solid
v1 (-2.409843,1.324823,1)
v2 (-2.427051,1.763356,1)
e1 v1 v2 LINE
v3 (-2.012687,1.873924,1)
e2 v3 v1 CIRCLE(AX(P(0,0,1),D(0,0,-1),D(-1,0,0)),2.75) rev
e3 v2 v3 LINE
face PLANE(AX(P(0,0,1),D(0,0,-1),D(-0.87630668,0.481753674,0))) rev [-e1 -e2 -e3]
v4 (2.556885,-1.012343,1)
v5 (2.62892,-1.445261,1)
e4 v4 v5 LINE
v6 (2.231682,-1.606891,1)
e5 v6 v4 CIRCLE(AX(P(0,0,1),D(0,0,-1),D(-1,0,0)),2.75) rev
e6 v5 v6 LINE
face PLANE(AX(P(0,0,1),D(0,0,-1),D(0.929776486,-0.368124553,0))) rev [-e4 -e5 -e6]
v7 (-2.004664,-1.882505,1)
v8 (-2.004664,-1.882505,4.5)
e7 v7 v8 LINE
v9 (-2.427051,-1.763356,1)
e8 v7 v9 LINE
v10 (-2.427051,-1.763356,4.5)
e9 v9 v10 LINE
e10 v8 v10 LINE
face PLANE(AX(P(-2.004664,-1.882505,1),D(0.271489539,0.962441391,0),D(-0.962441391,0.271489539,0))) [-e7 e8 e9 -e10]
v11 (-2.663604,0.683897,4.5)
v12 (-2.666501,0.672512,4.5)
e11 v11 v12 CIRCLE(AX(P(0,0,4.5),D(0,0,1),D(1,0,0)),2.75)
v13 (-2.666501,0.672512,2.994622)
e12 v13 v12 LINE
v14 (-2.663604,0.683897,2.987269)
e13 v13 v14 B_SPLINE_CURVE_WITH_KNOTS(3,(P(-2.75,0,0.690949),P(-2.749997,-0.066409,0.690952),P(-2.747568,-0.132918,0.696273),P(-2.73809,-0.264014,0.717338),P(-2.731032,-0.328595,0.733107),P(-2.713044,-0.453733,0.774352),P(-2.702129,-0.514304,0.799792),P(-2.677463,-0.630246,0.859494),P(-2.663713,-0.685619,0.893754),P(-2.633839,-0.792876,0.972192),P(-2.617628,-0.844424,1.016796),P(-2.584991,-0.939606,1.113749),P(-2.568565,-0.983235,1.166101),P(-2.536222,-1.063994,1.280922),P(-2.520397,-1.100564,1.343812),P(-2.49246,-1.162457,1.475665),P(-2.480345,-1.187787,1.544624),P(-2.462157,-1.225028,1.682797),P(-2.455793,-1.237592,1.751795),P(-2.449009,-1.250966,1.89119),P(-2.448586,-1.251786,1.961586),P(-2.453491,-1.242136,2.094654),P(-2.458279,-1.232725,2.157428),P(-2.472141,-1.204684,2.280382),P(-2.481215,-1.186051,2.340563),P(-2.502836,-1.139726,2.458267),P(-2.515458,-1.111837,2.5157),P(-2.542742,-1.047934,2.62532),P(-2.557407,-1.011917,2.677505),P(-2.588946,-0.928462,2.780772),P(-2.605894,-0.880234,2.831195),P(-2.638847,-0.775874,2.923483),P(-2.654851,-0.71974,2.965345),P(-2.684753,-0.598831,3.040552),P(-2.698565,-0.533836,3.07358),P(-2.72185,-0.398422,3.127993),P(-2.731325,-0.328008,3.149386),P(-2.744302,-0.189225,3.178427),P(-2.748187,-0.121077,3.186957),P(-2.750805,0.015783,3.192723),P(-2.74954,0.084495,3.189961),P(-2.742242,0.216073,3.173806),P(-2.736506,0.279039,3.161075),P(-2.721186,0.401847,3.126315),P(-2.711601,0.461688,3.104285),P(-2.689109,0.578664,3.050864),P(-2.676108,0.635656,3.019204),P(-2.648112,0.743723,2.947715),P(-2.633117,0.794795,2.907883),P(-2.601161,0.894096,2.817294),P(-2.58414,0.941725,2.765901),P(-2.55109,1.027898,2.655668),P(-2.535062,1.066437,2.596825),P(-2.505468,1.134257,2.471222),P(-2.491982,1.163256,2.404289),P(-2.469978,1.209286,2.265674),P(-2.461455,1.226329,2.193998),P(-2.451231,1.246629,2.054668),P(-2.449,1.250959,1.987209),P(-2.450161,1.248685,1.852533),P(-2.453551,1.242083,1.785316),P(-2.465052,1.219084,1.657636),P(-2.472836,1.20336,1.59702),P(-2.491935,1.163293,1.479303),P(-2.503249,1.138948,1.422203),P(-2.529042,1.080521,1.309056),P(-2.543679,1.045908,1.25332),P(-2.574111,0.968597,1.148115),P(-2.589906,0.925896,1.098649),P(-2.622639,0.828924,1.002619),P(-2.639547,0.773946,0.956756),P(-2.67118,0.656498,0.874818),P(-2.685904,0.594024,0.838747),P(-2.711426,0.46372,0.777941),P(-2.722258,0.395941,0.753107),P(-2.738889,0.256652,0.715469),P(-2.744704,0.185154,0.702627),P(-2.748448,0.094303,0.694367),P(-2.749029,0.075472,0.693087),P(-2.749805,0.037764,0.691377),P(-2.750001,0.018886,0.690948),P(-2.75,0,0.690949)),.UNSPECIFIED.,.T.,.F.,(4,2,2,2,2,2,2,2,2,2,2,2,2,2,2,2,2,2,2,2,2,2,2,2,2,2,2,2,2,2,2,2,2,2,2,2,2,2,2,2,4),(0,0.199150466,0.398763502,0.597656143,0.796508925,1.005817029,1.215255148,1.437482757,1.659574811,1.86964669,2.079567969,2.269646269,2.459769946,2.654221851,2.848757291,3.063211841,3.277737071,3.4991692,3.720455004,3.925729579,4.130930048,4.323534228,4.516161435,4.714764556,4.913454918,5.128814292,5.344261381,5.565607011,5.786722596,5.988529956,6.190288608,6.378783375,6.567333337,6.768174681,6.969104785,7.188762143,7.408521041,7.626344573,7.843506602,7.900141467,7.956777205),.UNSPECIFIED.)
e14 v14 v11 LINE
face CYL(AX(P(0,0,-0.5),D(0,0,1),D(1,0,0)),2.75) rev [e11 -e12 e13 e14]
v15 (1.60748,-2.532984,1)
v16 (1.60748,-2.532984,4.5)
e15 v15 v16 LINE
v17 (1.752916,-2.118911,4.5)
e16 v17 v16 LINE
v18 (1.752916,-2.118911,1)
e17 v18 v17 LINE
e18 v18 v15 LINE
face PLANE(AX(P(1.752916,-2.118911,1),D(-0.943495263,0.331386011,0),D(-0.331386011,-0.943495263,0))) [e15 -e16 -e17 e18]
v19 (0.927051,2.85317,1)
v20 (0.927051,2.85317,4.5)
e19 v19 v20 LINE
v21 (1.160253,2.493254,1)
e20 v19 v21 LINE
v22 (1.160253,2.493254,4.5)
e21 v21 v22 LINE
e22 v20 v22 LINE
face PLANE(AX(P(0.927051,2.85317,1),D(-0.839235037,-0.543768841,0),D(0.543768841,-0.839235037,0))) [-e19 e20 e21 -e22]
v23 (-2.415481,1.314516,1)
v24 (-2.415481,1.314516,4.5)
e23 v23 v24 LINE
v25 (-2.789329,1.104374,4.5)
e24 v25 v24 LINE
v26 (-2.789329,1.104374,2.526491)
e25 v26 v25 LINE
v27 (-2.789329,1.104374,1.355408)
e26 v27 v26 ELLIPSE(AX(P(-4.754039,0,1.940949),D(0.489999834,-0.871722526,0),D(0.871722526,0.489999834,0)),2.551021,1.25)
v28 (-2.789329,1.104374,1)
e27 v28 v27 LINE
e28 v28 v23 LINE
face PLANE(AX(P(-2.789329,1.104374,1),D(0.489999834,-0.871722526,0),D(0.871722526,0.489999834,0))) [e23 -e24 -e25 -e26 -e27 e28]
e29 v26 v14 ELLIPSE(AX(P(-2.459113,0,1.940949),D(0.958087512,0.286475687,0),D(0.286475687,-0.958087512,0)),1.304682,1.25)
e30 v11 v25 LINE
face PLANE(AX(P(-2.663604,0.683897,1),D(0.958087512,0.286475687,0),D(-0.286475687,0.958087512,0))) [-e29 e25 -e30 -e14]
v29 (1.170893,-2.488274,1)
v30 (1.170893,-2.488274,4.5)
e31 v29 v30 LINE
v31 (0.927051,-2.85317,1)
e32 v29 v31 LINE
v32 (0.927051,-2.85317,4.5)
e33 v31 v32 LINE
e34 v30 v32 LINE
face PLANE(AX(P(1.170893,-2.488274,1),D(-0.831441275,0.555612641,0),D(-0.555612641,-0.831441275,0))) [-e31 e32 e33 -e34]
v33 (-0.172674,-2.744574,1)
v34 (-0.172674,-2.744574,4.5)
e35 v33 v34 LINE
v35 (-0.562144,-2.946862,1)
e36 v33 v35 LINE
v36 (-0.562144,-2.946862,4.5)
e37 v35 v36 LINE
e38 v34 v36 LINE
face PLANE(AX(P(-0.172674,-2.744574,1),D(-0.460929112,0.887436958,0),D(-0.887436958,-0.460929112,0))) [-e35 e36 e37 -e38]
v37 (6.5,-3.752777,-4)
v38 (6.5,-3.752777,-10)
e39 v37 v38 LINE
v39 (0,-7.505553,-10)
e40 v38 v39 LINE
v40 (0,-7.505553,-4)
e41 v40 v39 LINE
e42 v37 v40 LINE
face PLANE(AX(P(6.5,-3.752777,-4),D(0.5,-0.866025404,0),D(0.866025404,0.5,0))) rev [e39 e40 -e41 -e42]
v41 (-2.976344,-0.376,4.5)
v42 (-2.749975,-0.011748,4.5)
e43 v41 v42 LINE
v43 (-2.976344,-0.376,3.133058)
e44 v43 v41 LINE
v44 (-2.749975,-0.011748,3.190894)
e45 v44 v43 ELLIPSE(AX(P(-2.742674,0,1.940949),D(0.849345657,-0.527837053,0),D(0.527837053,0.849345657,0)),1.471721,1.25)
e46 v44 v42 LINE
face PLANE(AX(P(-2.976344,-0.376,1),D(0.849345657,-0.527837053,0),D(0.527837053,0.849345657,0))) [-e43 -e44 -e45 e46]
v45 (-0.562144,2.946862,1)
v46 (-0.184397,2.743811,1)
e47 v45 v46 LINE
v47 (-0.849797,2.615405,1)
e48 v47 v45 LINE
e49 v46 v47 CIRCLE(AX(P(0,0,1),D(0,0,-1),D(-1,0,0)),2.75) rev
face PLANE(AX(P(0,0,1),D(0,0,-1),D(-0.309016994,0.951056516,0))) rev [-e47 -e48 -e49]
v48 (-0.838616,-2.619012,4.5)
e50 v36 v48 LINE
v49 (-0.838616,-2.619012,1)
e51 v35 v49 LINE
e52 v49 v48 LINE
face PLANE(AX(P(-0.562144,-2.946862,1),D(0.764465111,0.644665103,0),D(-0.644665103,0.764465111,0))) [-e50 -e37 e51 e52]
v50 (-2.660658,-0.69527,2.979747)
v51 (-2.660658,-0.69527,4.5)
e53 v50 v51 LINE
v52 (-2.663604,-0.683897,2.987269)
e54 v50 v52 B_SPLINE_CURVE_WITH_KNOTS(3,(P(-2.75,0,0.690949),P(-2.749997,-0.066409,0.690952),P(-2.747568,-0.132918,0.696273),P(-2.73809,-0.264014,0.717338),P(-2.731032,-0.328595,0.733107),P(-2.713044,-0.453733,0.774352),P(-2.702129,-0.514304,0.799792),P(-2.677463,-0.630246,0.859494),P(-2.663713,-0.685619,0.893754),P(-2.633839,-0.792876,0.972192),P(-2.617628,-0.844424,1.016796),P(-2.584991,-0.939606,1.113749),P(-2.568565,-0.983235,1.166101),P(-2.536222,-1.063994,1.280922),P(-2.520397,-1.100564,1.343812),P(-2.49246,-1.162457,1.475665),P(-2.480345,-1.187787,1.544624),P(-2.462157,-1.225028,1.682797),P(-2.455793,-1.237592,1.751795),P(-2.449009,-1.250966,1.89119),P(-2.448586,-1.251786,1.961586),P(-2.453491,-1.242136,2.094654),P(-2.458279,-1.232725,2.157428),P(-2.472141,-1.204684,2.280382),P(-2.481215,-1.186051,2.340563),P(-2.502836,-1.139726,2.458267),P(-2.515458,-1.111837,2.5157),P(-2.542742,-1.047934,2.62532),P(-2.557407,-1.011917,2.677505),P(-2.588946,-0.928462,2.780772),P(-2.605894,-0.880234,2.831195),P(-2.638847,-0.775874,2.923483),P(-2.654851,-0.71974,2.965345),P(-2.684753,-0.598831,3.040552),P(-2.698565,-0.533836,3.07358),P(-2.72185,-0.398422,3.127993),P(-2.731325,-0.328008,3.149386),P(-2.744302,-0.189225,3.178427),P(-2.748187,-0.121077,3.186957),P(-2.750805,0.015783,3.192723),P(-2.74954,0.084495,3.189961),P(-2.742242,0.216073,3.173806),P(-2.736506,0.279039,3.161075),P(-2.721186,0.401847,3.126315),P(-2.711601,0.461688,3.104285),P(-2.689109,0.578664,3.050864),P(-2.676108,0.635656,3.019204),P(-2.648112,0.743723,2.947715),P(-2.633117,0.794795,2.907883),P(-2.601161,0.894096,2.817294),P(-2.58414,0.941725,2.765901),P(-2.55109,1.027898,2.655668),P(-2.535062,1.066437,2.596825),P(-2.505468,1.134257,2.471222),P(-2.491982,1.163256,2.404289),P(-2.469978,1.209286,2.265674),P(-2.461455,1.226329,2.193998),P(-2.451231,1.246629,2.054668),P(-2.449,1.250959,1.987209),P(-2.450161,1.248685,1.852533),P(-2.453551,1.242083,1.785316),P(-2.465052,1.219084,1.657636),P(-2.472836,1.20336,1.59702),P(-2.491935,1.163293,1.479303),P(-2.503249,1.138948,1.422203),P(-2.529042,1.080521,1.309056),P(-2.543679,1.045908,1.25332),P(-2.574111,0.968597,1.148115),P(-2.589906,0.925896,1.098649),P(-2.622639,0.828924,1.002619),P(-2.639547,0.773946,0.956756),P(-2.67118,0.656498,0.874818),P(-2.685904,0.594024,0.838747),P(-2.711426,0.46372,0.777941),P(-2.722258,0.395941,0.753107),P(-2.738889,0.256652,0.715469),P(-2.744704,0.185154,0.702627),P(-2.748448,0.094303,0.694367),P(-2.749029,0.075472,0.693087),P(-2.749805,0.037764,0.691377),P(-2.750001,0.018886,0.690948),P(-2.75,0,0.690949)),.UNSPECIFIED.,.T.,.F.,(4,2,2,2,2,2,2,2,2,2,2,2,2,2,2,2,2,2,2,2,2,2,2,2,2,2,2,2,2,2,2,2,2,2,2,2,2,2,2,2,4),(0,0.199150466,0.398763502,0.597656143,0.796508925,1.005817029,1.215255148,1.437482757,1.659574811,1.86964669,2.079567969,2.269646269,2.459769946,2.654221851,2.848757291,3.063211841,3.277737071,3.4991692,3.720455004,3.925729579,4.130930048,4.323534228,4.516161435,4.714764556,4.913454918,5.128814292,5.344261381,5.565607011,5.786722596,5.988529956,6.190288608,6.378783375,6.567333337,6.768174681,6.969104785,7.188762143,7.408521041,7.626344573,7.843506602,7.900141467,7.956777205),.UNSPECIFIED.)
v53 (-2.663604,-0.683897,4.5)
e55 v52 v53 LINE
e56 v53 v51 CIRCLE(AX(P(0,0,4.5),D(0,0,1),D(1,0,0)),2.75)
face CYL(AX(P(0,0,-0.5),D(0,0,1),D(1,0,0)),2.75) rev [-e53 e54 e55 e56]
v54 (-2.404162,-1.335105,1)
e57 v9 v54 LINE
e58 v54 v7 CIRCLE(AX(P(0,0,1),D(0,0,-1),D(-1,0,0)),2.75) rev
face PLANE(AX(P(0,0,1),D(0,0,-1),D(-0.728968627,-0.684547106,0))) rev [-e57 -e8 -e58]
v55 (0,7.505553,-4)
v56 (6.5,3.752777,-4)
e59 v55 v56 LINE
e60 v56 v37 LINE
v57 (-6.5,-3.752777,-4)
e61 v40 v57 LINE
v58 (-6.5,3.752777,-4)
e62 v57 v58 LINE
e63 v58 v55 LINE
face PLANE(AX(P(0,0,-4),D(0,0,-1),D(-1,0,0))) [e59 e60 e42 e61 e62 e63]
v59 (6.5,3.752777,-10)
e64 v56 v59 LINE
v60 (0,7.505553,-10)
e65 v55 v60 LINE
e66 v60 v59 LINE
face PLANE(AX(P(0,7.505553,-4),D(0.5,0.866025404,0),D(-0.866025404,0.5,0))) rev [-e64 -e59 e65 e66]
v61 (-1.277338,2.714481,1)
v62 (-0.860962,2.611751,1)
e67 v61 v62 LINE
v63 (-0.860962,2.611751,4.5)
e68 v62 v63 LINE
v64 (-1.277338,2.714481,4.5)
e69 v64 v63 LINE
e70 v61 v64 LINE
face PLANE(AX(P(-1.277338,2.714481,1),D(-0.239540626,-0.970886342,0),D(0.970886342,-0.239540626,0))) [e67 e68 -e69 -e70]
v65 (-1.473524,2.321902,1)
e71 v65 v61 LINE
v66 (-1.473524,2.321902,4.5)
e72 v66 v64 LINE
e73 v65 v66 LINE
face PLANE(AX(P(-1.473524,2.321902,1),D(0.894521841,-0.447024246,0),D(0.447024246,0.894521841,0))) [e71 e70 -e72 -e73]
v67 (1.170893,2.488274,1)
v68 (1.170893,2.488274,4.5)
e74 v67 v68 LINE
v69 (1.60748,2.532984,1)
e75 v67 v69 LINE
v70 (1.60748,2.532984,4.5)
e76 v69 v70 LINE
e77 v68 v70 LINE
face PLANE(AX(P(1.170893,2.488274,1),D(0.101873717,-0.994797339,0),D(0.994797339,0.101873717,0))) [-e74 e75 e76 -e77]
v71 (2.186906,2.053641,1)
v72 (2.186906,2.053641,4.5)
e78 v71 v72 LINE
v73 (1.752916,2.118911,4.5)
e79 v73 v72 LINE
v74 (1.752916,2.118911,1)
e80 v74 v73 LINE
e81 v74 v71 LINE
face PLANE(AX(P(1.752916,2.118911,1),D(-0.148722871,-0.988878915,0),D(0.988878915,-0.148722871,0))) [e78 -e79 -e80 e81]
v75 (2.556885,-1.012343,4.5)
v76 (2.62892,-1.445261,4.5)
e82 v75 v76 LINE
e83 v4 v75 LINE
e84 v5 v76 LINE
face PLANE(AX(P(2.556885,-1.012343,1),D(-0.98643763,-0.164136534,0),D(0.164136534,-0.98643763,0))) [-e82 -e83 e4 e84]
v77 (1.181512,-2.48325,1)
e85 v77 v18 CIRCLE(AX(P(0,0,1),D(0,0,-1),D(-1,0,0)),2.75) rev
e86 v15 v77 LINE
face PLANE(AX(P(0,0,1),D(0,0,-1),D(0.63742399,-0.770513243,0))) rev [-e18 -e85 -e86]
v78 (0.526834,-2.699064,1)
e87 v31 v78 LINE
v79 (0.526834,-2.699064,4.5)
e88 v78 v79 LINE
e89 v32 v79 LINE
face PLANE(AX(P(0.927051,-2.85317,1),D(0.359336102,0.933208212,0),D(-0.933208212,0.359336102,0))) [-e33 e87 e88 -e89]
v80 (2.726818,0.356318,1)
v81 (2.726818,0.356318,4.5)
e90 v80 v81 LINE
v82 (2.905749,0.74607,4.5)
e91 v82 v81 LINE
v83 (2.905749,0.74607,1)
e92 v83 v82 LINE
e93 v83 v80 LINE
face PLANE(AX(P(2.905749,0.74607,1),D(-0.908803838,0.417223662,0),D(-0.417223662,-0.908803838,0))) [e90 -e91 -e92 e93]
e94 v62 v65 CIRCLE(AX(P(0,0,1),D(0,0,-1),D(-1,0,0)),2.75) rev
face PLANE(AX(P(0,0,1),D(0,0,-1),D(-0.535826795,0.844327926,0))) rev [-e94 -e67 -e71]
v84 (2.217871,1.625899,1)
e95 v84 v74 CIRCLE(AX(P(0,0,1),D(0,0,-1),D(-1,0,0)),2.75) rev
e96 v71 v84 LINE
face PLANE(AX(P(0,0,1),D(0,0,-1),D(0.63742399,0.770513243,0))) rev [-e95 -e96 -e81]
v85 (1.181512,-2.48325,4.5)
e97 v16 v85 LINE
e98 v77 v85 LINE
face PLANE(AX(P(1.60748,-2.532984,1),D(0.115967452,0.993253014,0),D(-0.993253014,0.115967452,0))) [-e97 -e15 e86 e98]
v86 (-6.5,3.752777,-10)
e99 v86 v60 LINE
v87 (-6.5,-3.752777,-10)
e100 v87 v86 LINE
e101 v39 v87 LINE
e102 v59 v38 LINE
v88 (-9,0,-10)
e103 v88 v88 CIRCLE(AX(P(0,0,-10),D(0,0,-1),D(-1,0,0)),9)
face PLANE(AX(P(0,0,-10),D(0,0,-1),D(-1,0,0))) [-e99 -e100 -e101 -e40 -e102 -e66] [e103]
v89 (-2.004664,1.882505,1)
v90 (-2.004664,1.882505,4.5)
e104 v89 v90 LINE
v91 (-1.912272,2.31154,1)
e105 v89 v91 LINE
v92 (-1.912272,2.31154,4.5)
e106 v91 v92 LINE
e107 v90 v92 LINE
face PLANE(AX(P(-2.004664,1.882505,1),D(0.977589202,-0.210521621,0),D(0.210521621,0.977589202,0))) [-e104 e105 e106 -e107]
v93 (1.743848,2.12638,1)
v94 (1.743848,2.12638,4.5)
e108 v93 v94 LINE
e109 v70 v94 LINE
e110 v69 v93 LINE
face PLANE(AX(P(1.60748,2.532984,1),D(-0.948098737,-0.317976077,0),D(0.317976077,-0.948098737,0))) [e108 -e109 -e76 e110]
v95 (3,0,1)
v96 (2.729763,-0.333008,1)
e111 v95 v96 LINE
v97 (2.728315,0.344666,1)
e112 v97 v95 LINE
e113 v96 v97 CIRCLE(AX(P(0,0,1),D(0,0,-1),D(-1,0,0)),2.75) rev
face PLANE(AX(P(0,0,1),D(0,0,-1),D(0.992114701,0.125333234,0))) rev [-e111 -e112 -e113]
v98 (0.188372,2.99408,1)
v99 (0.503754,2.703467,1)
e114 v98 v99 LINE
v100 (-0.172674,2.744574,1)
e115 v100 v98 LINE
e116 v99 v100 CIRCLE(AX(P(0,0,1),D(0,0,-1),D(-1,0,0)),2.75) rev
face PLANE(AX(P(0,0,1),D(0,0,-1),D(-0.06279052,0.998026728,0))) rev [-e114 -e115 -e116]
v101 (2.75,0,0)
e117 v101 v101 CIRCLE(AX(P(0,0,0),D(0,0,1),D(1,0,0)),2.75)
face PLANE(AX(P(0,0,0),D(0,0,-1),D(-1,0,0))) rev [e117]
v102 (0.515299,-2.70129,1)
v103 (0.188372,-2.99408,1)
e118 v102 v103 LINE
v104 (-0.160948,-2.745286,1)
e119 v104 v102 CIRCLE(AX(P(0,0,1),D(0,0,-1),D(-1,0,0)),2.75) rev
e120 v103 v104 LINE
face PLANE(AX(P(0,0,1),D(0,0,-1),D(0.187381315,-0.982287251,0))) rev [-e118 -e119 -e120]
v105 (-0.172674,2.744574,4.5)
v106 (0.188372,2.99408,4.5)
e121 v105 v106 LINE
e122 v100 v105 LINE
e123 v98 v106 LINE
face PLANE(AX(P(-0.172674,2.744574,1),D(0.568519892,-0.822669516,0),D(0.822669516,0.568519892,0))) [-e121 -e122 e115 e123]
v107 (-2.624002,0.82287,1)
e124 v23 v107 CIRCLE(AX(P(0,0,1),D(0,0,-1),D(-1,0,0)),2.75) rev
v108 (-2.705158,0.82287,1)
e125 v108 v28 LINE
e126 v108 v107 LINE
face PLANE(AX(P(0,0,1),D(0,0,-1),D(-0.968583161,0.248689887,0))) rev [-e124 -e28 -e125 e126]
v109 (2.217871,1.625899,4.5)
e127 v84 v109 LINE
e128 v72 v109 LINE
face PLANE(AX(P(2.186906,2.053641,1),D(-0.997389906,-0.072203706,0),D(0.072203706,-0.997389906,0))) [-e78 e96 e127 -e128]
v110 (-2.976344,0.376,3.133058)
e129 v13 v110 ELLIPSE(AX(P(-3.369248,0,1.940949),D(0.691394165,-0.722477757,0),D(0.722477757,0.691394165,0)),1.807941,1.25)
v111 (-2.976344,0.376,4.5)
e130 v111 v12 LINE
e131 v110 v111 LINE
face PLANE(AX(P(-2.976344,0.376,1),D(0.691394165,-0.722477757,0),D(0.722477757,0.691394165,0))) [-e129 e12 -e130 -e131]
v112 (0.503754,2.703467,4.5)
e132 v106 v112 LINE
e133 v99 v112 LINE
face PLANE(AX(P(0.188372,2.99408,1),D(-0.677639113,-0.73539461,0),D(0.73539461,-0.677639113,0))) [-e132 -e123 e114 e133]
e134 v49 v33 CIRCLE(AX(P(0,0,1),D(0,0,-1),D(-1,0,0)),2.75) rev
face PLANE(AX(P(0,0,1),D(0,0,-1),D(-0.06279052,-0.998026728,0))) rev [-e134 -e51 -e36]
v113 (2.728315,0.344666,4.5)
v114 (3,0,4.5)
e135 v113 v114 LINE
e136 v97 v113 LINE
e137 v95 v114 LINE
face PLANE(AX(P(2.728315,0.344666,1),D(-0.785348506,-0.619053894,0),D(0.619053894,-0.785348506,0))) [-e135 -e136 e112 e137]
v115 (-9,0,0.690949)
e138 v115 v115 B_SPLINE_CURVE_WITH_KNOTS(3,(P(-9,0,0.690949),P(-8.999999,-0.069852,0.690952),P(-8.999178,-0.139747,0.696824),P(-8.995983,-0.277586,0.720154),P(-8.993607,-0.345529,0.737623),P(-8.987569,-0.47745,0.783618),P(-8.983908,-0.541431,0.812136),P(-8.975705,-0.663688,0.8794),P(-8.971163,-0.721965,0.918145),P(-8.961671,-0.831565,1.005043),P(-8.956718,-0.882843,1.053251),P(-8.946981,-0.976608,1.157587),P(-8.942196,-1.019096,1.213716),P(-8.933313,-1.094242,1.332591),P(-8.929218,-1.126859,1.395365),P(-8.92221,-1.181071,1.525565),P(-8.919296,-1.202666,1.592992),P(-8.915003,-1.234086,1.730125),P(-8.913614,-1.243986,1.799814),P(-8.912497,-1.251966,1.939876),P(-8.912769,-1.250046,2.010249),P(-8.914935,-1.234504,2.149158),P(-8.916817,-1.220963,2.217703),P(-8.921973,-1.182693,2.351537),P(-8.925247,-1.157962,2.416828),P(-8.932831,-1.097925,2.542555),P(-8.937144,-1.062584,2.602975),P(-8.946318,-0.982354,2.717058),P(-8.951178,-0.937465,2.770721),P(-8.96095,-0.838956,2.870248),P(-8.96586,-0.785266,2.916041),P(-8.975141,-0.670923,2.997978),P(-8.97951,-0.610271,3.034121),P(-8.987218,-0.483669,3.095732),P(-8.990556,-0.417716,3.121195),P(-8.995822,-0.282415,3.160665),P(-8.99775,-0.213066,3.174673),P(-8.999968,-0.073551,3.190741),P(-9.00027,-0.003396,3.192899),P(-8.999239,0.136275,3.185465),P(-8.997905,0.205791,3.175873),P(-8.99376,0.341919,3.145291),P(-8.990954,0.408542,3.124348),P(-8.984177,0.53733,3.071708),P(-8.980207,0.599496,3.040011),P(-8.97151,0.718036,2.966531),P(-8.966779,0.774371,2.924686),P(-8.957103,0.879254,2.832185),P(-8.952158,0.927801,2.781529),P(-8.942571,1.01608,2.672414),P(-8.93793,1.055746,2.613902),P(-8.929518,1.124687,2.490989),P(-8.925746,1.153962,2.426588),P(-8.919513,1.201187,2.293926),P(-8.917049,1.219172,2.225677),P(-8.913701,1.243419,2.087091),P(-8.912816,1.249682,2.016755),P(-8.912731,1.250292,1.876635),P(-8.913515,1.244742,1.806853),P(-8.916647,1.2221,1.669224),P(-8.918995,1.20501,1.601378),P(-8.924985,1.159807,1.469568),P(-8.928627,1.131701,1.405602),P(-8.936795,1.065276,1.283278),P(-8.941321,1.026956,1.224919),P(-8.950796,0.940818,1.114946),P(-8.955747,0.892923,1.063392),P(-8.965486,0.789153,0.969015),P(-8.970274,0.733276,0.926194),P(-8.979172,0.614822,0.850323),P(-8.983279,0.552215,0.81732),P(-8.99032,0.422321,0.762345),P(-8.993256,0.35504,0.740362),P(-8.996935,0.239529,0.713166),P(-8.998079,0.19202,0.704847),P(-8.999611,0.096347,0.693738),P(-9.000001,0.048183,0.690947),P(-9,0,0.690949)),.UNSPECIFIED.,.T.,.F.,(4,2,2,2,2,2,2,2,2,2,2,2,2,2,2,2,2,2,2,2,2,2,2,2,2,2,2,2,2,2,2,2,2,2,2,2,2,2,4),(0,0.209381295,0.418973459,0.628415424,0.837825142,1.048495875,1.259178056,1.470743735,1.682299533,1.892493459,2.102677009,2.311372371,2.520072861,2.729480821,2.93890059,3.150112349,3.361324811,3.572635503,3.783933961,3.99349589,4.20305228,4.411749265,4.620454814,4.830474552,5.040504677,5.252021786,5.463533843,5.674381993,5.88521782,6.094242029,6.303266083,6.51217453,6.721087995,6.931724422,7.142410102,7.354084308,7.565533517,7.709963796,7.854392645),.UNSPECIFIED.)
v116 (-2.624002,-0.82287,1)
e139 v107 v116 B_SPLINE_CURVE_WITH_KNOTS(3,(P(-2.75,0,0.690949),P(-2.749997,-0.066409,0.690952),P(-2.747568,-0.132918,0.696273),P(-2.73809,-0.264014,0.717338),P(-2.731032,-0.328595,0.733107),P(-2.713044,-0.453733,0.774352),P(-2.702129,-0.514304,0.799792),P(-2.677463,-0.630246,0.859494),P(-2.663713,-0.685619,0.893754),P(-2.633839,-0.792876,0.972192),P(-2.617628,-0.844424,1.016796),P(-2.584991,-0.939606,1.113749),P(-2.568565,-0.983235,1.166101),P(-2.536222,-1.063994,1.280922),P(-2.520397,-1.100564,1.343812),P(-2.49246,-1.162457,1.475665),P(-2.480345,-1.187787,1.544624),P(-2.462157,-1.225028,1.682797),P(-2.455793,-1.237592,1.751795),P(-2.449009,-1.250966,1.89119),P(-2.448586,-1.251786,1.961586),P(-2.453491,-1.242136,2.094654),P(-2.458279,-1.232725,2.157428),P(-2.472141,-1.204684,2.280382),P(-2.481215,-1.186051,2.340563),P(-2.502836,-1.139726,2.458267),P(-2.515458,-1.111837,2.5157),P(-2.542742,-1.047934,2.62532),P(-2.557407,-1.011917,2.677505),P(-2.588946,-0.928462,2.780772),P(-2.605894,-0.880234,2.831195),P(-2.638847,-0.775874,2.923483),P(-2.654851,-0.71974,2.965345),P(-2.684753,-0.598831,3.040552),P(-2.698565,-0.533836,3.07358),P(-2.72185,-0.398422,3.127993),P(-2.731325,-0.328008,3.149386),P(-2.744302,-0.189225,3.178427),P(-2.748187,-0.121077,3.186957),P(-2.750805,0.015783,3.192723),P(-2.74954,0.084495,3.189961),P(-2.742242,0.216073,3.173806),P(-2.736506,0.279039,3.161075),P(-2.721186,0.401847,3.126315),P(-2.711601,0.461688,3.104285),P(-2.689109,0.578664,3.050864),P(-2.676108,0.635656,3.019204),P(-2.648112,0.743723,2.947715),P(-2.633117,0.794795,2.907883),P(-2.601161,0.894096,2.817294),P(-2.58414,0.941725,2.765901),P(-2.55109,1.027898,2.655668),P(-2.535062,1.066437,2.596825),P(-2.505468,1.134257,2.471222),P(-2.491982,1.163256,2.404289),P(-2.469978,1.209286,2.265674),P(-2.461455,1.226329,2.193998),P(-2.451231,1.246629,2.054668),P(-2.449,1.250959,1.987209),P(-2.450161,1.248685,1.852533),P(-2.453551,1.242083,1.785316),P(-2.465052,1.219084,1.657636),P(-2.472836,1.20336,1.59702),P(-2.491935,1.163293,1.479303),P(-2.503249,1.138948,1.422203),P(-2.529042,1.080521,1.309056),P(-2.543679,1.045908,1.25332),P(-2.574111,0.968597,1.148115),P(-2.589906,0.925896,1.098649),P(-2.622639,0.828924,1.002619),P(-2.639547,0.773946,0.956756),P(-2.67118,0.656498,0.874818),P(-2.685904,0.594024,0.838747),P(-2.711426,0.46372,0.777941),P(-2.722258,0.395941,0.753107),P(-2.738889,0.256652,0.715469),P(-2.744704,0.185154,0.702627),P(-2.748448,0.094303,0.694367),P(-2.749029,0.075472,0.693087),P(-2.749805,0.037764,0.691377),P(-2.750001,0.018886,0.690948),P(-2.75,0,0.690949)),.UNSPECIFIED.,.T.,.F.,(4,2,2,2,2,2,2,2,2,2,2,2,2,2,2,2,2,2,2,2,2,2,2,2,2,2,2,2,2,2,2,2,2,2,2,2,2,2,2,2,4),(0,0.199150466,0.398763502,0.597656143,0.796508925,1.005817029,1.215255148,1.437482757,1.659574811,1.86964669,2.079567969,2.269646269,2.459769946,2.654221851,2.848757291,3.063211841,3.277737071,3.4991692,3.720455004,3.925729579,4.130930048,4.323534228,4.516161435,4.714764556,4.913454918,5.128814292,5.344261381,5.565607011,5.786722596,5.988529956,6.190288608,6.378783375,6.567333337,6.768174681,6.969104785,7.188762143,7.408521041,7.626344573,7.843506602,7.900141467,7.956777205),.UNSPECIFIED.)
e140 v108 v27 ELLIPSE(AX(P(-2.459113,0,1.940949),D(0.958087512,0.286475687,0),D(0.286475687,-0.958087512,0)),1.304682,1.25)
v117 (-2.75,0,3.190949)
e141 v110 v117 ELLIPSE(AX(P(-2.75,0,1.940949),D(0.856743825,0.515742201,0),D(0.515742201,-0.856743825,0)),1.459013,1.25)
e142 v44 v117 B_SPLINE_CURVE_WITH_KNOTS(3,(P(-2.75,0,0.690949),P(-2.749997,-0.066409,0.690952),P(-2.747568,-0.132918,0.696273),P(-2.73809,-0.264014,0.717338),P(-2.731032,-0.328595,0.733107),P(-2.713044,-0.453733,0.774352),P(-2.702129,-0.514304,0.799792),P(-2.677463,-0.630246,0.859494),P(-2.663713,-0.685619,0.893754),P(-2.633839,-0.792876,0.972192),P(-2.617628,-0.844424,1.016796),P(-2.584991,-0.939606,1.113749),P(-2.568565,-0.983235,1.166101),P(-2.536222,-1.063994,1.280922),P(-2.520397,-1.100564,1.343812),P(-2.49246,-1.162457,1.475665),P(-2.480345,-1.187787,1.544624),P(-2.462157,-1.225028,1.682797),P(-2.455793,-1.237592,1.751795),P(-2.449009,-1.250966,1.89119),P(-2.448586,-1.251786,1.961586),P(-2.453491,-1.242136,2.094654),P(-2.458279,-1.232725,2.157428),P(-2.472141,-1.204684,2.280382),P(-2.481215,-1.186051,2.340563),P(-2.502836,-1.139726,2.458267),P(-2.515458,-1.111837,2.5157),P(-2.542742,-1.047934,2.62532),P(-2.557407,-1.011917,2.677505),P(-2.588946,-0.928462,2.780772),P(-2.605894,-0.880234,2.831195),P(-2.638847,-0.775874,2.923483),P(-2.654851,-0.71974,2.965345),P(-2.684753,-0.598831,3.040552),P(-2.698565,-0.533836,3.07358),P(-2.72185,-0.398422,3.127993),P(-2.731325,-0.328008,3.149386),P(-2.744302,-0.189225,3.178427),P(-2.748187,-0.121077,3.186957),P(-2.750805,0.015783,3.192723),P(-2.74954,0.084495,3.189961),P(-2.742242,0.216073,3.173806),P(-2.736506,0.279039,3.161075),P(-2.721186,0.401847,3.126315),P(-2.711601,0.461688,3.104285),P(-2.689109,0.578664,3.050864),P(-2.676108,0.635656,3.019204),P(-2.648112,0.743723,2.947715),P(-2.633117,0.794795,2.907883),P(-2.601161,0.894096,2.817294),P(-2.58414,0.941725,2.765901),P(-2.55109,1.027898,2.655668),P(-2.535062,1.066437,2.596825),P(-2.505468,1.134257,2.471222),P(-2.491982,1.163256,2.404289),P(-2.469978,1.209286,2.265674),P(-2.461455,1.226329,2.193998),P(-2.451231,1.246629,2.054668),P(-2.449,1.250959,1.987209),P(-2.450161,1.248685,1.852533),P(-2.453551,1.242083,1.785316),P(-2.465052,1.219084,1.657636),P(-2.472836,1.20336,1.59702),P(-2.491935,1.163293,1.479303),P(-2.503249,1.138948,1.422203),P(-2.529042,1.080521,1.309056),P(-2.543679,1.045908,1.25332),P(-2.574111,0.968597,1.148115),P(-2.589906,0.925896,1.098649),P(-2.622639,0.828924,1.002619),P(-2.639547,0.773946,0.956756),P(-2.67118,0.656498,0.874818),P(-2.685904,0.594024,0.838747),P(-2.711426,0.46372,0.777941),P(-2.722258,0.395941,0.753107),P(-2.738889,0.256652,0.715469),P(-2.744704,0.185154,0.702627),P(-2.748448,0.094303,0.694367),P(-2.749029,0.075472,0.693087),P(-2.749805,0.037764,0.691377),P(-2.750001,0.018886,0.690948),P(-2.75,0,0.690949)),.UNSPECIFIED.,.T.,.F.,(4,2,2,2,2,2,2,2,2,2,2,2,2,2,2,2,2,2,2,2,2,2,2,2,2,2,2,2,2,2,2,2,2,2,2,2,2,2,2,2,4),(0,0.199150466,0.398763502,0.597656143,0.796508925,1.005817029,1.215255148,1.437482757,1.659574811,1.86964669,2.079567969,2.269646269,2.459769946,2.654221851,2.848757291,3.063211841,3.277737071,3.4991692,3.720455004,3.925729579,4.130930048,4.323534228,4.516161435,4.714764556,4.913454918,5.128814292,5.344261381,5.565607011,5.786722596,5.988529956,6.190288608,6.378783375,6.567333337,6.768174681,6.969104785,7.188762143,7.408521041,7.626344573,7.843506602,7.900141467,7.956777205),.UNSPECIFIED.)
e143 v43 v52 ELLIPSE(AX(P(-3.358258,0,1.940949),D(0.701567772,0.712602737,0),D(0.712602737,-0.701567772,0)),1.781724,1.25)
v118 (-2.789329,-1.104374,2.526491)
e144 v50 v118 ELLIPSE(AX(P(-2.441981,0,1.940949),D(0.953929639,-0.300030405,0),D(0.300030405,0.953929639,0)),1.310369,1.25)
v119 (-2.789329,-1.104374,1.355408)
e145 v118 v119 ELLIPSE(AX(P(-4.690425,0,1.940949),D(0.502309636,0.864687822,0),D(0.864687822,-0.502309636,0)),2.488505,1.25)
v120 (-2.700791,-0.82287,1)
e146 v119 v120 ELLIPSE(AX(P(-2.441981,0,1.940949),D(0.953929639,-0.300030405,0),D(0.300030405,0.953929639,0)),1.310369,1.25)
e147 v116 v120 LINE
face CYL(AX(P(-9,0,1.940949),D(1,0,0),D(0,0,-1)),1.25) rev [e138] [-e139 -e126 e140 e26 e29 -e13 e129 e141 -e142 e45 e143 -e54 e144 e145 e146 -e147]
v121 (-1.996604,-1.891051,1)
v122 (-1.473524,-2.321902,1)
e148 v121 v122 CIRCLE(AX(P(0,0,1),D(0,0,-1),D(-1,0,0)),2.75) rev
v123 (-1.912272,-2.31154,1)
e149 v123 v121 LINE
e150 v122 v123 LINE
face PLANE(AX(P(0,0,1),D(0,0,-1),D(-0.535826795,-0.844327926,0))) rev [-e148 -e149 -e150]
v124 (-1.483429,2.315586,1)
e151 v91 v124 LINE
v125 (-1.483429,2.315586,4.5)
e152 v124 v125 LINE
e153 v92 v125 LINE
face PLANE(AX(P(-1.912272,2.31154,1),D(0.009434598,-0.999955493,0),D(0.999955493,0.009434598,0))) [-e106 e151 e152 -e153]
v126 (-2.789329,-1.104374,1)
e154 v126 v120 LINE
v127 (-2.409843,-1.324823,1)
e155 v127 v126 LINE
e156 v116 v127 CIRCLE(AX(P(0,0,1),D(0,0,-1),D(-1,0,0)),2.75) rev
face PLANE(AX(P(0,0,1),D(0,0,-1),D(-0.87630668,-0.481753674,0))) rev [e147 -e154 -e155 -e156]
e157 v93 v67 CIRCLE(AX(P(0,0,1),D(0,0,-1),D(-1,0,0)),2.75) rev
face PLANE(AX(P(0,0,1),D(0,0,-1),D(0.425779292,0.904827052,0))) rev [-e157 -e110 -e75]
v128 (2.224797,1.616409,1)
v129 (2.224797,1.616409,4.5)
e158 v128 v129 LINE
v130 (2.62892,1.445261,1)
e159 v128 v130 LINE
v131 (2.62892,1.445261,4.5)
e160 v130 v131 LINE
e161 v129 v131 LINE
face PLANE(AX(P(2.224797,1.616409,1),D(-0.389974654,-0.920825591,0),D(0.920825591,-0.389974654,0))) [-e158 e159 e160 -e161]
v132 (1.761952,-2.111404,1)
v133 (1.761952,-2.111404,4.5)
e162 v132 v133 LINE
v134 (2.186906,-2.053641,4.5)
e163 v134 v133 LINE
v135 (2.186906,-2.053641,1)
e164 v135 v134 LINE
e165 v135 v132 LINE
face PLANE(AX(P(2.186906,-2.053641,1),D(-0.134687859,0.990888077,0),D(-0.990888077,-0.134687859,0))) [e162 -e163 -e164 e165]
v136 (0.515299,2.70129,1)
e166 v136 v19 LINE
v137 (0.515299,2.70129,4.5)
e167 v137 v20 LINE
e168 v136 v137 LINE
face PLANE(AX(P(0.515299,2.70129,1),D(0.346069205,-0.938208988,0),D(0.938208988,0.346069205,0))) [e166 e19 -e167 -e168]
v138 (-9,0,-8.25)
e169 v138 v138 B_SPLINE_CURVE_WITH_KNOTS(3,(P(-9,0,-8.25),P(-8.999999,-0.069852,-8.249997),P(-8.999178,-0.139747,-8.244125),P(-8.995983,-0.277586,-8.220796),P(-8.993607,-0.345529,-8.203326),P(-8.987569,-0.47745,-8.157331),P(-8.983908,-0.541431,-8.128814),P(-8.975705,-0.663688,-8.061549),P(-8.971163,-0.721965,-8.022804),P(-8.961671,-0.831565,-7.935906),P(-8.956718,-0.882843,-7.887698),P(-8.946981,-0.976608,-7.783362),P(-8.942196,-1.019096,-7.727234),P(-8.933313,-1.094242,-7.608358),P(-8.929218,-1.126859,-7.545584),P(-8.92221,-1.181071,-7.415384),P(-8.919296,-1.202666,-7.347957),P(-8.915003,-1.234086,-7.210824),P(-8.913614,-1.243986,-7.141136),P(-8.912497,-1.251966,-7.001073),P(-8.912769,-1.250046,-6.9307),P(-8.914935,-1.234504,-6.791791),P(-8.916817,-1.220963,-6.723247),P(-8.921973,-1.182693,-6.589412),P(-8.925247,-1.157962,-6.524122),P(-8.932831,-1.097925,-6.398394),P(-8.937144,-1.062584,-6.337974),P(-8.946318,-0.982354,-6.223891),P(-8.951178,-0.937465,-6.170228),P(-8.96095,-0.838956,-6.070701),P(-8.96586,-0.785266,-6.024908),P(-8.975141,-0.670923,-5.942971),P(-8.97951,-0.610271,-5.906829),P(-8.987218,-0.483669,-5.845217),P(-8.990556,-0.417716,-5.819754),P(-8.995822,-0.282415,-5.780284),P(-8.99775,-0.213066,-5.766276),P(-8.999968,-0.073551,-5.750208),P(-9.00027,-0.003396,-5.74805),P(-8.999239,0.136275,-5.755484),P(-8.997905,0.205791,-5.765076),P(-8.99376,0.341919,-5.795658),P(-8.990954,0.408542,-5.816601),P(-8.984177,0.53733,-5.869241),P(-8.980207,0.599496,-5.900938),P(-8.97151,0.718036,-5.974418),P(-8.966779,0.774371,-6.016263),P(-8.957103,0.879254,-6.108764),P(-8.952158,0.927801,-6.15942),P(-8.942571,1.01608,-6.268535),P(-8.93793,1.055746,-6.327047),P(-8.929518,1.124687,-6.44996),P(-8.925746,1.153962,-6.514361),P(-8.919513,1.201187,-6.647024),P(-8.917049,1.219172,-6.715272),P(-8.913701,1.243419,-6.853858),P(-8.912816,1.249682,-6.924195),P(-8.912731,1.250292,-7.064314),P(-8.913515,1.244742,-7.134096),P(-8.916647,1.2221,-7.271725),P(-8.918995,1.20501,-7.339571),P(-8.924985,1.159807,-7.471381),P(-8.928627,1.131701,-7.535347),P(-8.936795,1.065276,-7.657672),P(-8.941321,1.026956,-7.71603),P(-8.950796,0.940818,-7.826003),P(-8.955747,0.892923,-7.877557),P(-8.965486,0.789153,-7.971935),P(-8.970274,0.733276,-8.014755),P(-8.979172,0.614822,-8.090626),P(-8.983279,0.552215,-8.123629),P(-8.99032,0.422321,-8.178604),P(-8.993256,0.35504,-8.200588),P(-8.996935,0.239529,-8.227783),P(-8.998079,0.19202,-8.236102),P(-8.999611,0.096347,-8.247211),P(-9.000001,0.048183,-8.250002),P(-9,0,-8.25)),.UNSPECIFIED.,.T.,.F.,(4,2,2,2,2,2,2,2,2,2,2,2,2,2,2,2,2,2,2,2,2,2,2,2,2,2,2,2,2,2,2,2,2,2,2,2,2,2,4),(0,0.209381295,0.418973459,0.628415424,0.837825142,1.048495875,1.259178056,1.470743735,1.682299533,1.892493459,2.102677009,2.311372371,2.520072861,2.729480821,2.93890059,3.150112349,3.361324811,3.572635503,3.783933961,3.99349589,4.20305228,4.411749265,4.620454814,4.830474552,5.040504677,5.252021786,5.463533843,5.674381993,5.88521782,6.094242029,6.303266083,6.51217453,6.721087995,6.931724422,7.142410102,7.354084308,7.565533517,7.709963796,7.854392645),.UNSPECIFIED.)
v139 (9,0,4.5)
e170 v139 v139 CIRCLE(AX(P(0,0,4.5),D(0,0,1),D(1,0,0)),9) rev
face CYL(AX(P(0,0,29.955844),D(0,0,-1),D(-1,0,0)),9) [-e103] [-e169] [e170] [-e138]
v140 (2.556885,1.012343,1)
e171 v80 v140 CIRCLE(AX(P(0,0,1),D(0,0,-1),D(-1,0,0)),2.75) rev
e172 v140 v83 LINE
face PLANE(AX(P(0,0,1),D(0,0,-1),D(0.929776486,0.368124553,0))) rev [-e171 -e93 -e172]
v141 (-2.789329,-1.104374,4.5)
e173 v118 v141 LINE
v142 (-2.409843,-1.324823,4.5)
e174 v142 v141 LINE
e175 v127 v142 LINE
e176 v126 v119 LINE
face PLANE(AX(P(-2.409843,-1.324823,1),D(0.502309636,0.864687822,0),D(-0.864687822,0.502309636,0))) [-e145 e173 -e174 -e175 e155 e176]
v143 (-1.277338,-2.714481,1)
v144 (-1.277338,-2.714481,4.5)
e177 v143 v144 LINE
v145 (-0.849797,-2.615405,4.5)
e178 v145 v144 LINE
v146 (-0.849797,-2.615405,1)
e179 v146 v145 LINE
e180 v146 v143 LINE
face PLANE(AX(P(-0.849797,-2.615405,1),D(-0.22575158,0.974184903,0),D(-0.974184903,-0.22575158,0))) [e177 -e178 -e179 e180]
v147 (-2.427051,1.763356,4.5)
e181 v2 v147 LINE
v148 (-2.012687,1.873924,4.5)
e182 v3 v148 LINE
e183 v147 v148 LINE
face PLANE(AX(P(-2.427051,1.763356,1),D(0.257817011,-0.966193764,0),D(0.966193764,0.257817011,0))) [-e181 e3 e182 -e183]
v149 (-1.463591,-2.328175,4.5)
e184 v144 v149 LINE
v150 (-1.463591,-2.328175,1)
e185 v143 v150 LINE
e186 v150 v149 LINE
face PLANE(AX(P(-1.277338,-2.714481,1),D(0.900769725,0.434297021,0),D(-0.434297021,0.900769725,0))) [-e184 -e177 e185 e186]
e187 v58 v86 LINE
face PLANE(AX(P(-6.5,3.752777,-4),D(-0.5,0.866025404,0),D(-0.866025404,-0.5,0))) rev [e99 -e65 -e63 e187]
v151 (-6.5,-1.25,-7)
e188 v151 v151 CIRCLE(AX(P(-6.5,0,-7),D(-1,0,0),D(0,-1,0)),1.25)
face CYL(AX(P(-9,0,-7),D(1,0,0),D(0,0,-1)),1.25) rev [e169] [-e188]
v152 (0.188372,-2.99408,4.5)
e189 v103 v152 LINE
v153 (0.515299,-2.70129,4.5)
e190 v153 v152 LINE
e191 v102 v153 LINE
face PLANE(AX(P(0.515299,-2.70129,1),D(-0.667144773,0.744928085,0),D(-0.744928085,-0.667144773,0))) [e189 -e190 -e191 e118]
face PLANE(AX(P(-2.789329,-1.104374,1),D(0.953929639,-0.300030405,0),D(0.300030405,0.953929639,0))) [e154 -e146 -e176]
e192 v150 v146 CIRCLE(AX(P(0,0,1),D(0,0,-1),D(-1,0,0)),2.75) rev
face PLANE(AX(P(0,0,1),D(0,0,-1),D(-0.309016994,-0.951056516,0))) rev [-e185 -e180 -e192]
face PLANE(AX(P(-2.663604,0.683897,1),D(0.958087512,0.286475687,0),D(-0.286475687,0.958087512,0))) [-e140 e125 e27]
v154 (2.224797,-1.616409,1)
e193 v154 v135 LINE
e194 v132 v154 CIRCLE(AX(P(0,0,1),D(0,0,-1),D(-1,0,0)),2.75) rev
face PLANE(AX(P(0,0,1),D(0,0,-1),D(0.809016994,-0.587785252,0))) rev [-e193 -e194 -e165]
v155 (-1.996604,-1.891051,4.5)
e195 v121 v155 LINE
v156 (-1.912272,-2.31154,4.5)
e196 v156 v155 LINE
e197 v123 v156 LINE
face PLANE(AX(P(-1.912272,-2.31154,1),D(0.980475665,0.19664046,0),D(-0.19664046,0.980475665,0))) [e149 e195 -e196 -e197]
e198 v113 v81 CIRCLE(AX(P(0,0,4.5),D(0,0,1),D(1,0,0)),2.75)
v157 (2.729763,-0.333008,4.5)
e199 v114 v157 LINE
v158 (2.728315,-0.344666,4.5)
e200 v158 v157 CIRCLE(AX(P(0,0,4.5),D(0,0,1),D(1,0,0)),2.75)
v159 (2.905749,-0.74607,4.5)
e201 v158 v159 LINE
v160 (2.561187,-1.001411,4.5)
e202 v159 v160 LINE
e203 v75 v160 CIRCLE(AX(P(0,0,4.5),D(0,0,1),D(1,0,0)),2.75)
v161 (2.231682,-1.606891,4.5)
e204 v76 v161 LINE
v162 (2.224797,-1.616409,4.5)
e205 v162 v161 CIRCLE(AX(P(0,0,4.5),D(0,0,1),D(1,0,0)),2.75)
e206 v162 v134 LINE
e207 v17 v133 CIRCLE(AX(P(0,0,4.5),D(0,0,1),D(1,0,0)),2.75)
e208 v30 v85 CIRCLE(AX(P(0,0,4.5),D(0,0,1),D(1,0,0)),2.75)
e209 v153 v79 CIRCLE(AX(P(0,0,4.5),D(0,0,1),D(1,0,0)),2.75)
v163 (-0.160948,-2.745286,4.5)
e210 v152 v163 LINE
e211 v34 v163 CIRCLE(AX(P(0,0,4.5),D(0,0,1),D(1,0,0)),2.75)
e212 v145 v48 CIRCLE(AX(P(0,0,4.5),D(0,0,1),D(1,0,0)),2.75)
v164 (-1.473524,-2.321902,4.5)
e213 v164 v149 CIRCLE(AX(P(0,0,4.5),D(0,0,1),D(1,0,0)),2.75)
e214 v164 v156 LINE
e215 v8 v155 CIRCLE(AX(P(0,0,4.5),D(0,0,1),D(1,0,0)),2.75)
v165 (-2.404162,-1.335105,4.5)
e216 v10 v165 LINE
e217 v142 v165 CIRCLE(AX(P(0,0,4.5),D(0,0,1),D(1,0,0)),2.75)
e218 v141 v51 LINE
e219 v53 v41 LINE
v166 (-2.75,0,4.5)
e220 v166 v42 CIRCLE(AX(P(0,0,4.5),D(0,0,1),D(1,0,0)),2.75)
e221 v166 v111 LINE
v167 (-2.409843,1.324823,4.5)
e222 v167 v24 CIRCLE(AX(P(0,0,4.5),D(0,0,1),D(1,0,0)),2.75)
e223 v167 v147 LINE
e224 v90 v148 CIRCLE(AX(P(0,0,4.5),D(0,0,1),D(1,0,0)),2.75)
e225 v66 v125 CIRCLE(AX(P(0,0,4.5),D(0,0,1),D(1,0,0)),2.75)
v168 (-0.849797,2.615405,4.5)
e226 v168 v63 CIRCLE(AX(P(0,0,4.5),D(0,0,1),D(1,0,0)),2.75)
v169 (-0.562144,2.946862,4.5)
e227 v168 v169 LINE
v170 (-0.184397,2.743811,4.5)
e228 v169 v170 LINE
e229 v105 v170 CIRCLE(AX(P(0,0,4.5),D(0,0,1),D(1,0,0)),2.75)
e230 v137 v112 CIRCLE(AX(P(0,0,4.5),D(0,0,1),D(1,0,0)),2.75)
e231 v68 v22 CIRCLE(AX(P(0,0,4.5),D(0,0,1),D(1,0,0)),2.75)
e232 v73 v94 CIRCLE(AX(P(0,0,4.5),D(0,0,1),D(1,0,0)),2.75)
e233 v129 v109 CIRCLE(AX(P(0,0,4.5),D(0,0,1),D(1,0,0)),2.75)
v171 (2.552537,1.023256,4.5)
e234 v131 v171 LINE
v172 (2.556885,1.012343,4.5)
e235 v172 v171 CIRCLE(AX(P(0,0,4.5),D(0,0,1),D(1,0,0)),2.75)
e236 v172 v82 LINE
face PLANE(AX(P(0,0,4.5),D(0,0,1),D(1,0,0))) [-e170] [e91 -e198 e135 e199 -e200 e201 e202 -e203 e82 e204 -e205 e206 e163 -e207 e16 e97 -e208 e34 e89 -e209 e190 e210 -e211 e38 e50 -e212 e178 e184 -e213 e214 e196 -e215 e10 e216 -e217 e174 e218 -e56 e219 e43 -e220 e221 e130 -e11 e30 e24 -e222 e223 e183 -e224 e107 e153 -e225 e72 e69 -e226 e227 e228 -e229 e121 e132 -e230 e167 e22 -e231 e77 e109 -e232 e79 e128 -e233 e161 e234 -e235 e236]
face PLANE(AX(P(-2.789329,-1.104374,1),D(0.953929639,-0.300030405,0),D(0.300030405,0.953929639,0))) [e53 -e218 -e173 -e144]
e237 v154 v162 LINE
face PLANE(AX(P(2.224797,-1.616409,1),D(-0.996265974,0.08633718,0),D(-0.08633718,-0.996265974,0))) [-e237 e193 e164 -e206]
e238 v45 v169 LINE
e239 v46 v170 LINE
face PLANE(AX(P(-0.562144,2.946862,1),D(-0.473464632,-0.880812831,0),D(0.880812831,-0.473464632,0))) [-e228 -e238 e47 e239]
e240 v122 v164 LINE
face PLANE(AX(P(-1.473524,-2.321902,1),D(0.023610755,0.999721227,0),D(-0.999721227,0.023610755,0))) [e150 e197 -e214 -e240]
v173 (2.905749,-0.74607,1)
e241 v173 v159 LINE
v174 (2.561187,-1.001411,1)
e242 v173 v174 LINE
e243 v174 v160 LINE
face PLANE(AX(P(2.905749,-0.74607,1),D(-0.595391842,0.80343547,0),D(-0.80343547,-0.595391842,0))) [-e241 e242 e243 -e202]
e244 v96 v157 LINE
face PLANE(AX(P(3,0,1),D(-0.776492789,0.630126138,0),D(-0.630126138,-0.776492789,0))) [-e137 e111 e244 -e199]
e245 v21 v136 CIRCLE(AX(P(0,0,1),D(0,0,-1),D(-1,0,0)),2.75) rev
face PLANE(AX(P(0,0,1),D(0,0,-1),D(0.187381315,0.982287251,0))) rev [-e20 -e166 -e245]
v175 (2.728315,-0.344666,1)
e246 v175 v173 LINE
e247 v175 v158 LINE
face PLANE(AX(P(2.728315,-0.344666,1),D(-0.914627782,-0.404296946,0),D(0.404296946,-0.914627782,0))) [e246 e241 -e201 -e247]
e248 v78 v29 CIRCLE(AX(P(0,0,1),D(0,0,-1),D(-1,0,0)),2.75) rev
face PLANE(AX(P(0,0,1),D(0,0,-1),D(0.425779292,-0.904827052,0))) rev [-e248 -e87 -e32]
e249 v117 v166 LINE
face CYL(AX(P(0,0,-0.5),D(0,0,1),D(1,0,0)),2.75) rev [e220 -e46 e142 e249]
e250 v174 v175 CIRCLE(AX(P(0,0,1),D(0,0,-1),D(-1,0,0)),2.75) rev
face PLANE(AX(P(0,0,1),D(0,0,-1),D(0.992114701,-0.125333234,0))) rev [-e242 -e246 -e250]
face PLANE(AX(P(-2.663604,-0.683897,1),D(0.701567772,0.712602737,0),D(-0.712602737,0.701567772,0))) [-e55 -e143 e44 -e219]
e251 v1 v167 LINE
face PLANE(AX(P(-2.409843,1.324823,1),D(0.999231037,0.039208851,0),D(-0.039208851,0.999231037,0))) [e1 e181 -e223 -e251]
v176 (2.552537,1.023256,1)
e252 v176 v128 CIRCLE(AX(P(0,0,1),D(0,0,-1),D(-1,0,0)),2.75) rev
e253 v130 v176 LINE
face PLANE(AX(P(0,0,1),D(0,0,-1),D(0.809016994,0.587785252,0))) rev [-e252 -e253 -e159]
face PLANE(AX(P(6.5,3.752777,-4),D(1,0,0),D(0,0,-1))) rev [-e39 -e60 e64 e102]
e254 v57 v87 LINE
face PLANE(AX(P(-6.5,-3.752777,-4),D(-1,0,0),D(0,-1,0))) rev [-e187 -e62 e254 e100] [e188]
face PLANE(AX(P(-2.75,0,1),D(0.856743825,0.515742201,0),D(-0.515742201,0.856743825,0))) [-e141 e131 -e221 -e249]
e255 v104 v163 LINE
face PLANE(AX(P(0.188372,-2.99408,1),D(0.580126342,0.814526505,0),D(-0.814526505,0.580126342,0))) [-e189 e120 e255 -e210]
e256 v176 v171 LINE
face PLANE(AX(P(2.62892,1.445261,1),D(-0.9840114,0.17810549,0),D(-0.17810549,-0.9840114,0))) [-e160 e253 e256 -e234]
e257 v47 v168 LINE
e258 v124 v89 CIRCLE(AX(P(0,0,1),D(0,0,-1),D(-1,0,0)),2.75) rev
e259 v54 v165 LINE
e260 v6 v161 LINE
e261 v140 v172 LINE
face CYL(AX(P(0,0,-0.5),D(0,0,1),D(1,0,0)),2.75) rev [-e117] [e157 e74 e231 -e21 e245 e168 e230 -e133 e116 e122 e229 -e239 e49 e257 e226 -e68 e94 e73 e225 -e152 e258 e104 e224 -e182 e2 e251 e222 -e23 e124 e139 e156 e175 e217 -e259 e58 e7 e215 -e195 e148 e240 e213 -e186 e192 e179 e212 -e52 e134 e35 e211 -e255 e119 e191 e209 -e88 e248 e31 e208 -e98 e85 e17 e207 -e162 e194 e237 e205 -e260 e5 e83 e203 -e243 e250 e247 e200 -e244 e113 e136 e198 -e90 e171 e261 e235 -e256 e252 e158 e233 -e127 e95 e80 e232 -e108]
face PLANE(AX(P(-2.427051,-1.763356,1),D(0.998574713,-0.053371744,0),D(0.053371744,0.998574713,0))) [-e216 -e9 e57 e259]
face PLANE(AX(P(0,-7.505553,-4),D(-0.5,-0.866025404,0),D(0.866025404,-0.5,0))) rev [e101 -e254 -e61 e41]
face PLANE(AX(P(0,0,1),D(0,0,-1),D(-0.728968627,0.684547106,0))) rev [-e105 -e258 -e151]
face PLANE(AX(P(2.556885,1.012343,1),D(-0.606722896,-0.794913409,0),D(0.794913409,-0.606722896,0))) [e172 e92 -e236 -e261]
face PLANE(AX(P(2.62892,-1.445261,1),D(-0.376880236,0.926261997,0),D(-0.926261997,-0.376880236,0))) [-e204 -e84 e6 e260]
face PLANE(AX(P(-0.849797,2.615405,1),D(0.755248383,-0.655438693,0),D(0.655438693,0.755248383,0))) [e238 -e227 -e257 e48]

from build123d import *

# Parameters (mm, degrees)
SKETCH1_R           = 10
BOSS_EXTRUDE1_DEPTH = 2
SKETCH2_R           = 4.5
BOSS_EXTRUDE2_DEPTH = 2.5
SKETCH3_R           = 2.75
CUT_EXTRUDE1_DEPTH  = 5
CUT_EXTRUDE3_DEPTH  = 3.5
CIRPATTERN1_COUNT   = 25
SKETCH6_R           = 1.5
CUT_EXTRUDE4_DEPTH  = 15.361406616
FILLET1_R           = 0.1
THREAD1_PITCH       = 0.3175
CUT_EXTRUDE5_START  = -10
SKETCH7_R           = 11.568121222
SKETCH7_R_2         = 4.5
CUT_EXTRUDE5_DEPTH  = 10
BOSS_EXTRUDE3_START = 10
SKETCH8_R           = 4.5
BOSS_EXTRUDE3_DEPTH = 10
SKETCH9_R           = 9
SKETCH9_R_2         = 4.5
BOSS_EXTRUDE4_DEPTH = 14.5
CUT_EXTRUDE6_DEPTH  = 6
SKETCH11_R          = 1.25
CUT_EXTRUDE7_DEPTH  = 9


with BuildPart() as part:
    # Sketch1 → Boss-Extrude1 (new body)
    with BuildSketch(Plane.XY):
        Circle(SKETCH1_R)
    extrude(amount=BOSS_EXTRUDE1_DEPTH)

    # Sketch2 → Boss-Extrude2 (add)
    with BuildSketch(Plane.XY.offset(2)):
        Circle(SKETCH2_R)
    extrude(amount=BOSS_EXTRUDE2_DEPTH)

    # Sketch3 → Cut-Extrude1 (cut)
    with BuildSketch(Plane.XY.offset(4.5)):
        Circle(SKETCH3_R)
    extrude(amount=-CUT_EXTRUDE1_DEPTH, mode=Mode.SUBTRACT)

    # Sketch5 → Cut-Extrude3 (cut)
    with BuildSketch(Plane.XY.offset(4.5)):
        Polygon((-2.656507983, 0.682075321), (-2.682344512, 0.606240809), (-2.75, 0), (-2.976344104, 0.375999701), align=None)
    cut_extrude3 = extrude(amount=-CUT_EXTRUDE3_DEPTH, mode=Mode.SUBTRACT)

    # CirPattern1: Cut-Extrude3 ×25 about axis
    cirpattern1_axis = Axis((0, 0, 0), (0, 0, 1))
    for i in range(1, CIRPATTERN1_COUNT):
        add(cut_extrude3.rotate(cirpattern1_axis, i * 360 / CIRPATTERN1_COUNT), mode=Mode.SUBTRACT)

    # Sketch6 → Cut-Extrude4 (cut, through all)
    with BuildSketch(Plane.XY.offset(2)):
        with Locations((-7, 0)):
            Circle(SKETCH6_R)
        with Locations(Location((7, 0, 0), (0, 0, 180))):
            Circle(SKETCH6_R)
        with Locations(Location((0, 7, 0), (0, 0, 180))):
            Circle(SKETCH6_R)
        with Locations((0, -7)):
            Circle(SKETCH6_R)
    extrude(amount=-CUT_EXTRUDE4_DEPTH, mode=Mode.SUBTRACT)

    # Fillet1
    fillet1_edges = [part.edges().sort_by_distance(p)[0] for p in [
        (8.5, 0, 2),
    ]]
    fillet(fillet1_edges, radius=FILLET1_R)

    # Thread1: the profile of Thread Profile3 profile screwed along a right-hand helix of 6.299213 turns, 6 arcs to a turn; built about Z, then put on its axis
    thread1_z = Axis((0, 0, 0), (0, 0, 1))
    thread1_corners = [(1.5003, 0, -0.000173205), (1.5003, 0, 0.277985704), (1.328148085, 0, 0.17859375), (1.328148085, 0, 0.09921875)]
    with BuildLine(mode=Mode.PRIVATE) as thread1_profile:
        Line(thread1_corners[0], thread1_corners[1])
        Line(thread1_corners[1], thread1_corners[2])
        Line(thread1_corners[2], thread1_corners[3])
        Line(thread1_corners[3], thread1_corners[0])
    thread1_cap = Face(thread1_profile.wire())
    thread1_turn_angles = [0, 30, 60, 90, 120, 150, 180, 210, 240, 270, 300, 330, 360]
    thread1_turn_weights = [1, 0.8660254037844387, 1, 0.8660254037844387, 1, 0.8660254037844387, 1, 0.8660254037844387, 1, 0.8660254037844387, 1, 0.8660254037844387, 1]
    thread1_turn_rails = [Edge.make_bspline([Vector(p[0], p[1], 0).rotate(thread1_z, thread1_turn_angles[k]) / thread1_turn_weights[k] + Vector(0, 0, p[2] + THREAD1_PITCH * thread1_turn_angles[k] / 360) for k in range(13)], [0, 0, 0, 1, 1, 2, 2, 3, 3, 4, 4, 5, 5, 6, 6, 6], 2, thread1_turn_weights) for p in thread1_corners]
    thread1_turn_sides = [Face.make_surface_from_curves(thread1_turn_rails[p[0]], thread1_turn_rails[p[1]]) for p in [(0, 1), (1, 2), (2, 3), (3, 0)]]
    thread1_last_angles = [2160, 2190, 2220, 2243.858267717, 2267.716535433]
    thread1_last_weights = [1, 0.8660254037844387, 1, 0.9145488039507501, 1]
    thread1_last_rails = [Edge.make_bspline([Vector(p[0], p[1], 0).rotate(thread1_z, thread1_last_angles[k]) / thread1_last_weights[k] + Vector(0, 0, p[2] + THREAD1_PITCH * thread1_last_angles[k] / 360) for k in range(5)], [0, 0, 0, 1, 1, 2, 2, 2], 2, thread1_last_weights) for p in thread1_corners]
    thread1_last_sides = [Face.make_surface_from_curves(thread1_last_rails[p[0]], thread1_last_rails[p[1]]) for p in [(0, 1), (1, 2), (2, 3), (3, 0)]]
    thread1 = Plane(origin=(7, 0, 1.9), x_dir=(-1, 0, 0), z_dir=(0, 0, -1)) * Solid(Shell([*[p.moved(Location((0, 0, THREAD1_PITCH * i))) for i in range(6) for p in thread1_turn_sides], *thread1_last_sides, thread1_cap, thread1_cap.rotate(thread1_z, 2267.716535433).moved(Location((0, 0, THREAD1_PITCH * 2267.716535433 / 360)))]))
    add(thread1)

    # Sketch7 → Cut-Extrude5 (cut)
    with BuildSketch(Plane.XY.offset(4.5).offset(CUT_EXTRUDE5_START)):
        Circle(SKETCH7_R)
        Circle(SKETCH7_R_2, mode=Mode.SUBTRACT)
    extrude(amount=CUT_EXTRUDE5_DEPTH, mode=Mode.SUBTRACT)

    # Sketch8 → Boss-Extrude3 (add)
    with BuildSketch(Plane(origin=(0, 0, 0), x_dir=(-1, 0, 0), z_dir=(0, 0, -1)).offset(BOSS_EXTRUDE3_START)):
        Circle(SKETCH8_R)
    extrude(amount=-BOSS_EXTRUDE3_DEPTH)

    # Sketch9 → Boss-Extrude4 (add)
    # profile 1 of 2: a face of its own
    with BuildSketch(Plane(origin=(0, 0, -10), x_dir=(-1, 0, 0), z_dir=(0, 0, -1))):
        Circle(SKETCH9_R)
        Polygon((5, 2.886751346), (0, 5.773502692), (-5, 2.886751346), (-5, -2.886751346), (0, -5.773502692), (5, -2.886751346), align=None, mode=Mode.SUBTRACT)
    # profile 2 of 2: a face of its own
    with BuildSketch(Plane(origin=(0, 0, -10), x_dir=(-1, 0, 0), z_dir=(0, 0, -1))):
        Polygon((5, -2.886751346), (5, 2.886751346), (0, 5.773502692), (-5, 2.886751346), (-5, -2.886751346), (0, -5.773502692), align=None)
        Circle(SKETCH9_R_2, mode=Mode.SUBTRACT)
    extrude(amount=-BOSS_EXTRUDE4_DEPTH)

    # Sketch10 → Cut-Extrude6 (cut)
    with BuildSketch(Plane(origin=(0, 0, -10), x_dir=(-1, 0, 0), z_dir=(0, 0, -1))):
        Polygon((0, 7.505553499), (-6.5, 3.75277675), (-6.5, -3.75277675), (0, -7.505553499), (6.5, -3.75277675), (6.5, 3.75277675), align=None)
    extrude(amount=-CUT_EXTRUDE6_DEPTH, mode=Mode.SUBTRACT)

    # Sketch11 → Cut-Extrude7 (cut)
    with BuildSketch(Plane(origin=(0, 0, 0), x_dir=(0, 0, -1), z_dir=(1, 0, 0))):
        with Locations(Location((-1.940949094, 0, 0), (0, 0, 180.000000024))):
            Circle(SKETCH11_R)
        with Locations((7, 0)):
            Circle(SKETCH11_R)
    extrude(amount=-CUT_EXTRUDE7_DEPTH, mode=Mode.SUBTRACT)


solid = part.part
